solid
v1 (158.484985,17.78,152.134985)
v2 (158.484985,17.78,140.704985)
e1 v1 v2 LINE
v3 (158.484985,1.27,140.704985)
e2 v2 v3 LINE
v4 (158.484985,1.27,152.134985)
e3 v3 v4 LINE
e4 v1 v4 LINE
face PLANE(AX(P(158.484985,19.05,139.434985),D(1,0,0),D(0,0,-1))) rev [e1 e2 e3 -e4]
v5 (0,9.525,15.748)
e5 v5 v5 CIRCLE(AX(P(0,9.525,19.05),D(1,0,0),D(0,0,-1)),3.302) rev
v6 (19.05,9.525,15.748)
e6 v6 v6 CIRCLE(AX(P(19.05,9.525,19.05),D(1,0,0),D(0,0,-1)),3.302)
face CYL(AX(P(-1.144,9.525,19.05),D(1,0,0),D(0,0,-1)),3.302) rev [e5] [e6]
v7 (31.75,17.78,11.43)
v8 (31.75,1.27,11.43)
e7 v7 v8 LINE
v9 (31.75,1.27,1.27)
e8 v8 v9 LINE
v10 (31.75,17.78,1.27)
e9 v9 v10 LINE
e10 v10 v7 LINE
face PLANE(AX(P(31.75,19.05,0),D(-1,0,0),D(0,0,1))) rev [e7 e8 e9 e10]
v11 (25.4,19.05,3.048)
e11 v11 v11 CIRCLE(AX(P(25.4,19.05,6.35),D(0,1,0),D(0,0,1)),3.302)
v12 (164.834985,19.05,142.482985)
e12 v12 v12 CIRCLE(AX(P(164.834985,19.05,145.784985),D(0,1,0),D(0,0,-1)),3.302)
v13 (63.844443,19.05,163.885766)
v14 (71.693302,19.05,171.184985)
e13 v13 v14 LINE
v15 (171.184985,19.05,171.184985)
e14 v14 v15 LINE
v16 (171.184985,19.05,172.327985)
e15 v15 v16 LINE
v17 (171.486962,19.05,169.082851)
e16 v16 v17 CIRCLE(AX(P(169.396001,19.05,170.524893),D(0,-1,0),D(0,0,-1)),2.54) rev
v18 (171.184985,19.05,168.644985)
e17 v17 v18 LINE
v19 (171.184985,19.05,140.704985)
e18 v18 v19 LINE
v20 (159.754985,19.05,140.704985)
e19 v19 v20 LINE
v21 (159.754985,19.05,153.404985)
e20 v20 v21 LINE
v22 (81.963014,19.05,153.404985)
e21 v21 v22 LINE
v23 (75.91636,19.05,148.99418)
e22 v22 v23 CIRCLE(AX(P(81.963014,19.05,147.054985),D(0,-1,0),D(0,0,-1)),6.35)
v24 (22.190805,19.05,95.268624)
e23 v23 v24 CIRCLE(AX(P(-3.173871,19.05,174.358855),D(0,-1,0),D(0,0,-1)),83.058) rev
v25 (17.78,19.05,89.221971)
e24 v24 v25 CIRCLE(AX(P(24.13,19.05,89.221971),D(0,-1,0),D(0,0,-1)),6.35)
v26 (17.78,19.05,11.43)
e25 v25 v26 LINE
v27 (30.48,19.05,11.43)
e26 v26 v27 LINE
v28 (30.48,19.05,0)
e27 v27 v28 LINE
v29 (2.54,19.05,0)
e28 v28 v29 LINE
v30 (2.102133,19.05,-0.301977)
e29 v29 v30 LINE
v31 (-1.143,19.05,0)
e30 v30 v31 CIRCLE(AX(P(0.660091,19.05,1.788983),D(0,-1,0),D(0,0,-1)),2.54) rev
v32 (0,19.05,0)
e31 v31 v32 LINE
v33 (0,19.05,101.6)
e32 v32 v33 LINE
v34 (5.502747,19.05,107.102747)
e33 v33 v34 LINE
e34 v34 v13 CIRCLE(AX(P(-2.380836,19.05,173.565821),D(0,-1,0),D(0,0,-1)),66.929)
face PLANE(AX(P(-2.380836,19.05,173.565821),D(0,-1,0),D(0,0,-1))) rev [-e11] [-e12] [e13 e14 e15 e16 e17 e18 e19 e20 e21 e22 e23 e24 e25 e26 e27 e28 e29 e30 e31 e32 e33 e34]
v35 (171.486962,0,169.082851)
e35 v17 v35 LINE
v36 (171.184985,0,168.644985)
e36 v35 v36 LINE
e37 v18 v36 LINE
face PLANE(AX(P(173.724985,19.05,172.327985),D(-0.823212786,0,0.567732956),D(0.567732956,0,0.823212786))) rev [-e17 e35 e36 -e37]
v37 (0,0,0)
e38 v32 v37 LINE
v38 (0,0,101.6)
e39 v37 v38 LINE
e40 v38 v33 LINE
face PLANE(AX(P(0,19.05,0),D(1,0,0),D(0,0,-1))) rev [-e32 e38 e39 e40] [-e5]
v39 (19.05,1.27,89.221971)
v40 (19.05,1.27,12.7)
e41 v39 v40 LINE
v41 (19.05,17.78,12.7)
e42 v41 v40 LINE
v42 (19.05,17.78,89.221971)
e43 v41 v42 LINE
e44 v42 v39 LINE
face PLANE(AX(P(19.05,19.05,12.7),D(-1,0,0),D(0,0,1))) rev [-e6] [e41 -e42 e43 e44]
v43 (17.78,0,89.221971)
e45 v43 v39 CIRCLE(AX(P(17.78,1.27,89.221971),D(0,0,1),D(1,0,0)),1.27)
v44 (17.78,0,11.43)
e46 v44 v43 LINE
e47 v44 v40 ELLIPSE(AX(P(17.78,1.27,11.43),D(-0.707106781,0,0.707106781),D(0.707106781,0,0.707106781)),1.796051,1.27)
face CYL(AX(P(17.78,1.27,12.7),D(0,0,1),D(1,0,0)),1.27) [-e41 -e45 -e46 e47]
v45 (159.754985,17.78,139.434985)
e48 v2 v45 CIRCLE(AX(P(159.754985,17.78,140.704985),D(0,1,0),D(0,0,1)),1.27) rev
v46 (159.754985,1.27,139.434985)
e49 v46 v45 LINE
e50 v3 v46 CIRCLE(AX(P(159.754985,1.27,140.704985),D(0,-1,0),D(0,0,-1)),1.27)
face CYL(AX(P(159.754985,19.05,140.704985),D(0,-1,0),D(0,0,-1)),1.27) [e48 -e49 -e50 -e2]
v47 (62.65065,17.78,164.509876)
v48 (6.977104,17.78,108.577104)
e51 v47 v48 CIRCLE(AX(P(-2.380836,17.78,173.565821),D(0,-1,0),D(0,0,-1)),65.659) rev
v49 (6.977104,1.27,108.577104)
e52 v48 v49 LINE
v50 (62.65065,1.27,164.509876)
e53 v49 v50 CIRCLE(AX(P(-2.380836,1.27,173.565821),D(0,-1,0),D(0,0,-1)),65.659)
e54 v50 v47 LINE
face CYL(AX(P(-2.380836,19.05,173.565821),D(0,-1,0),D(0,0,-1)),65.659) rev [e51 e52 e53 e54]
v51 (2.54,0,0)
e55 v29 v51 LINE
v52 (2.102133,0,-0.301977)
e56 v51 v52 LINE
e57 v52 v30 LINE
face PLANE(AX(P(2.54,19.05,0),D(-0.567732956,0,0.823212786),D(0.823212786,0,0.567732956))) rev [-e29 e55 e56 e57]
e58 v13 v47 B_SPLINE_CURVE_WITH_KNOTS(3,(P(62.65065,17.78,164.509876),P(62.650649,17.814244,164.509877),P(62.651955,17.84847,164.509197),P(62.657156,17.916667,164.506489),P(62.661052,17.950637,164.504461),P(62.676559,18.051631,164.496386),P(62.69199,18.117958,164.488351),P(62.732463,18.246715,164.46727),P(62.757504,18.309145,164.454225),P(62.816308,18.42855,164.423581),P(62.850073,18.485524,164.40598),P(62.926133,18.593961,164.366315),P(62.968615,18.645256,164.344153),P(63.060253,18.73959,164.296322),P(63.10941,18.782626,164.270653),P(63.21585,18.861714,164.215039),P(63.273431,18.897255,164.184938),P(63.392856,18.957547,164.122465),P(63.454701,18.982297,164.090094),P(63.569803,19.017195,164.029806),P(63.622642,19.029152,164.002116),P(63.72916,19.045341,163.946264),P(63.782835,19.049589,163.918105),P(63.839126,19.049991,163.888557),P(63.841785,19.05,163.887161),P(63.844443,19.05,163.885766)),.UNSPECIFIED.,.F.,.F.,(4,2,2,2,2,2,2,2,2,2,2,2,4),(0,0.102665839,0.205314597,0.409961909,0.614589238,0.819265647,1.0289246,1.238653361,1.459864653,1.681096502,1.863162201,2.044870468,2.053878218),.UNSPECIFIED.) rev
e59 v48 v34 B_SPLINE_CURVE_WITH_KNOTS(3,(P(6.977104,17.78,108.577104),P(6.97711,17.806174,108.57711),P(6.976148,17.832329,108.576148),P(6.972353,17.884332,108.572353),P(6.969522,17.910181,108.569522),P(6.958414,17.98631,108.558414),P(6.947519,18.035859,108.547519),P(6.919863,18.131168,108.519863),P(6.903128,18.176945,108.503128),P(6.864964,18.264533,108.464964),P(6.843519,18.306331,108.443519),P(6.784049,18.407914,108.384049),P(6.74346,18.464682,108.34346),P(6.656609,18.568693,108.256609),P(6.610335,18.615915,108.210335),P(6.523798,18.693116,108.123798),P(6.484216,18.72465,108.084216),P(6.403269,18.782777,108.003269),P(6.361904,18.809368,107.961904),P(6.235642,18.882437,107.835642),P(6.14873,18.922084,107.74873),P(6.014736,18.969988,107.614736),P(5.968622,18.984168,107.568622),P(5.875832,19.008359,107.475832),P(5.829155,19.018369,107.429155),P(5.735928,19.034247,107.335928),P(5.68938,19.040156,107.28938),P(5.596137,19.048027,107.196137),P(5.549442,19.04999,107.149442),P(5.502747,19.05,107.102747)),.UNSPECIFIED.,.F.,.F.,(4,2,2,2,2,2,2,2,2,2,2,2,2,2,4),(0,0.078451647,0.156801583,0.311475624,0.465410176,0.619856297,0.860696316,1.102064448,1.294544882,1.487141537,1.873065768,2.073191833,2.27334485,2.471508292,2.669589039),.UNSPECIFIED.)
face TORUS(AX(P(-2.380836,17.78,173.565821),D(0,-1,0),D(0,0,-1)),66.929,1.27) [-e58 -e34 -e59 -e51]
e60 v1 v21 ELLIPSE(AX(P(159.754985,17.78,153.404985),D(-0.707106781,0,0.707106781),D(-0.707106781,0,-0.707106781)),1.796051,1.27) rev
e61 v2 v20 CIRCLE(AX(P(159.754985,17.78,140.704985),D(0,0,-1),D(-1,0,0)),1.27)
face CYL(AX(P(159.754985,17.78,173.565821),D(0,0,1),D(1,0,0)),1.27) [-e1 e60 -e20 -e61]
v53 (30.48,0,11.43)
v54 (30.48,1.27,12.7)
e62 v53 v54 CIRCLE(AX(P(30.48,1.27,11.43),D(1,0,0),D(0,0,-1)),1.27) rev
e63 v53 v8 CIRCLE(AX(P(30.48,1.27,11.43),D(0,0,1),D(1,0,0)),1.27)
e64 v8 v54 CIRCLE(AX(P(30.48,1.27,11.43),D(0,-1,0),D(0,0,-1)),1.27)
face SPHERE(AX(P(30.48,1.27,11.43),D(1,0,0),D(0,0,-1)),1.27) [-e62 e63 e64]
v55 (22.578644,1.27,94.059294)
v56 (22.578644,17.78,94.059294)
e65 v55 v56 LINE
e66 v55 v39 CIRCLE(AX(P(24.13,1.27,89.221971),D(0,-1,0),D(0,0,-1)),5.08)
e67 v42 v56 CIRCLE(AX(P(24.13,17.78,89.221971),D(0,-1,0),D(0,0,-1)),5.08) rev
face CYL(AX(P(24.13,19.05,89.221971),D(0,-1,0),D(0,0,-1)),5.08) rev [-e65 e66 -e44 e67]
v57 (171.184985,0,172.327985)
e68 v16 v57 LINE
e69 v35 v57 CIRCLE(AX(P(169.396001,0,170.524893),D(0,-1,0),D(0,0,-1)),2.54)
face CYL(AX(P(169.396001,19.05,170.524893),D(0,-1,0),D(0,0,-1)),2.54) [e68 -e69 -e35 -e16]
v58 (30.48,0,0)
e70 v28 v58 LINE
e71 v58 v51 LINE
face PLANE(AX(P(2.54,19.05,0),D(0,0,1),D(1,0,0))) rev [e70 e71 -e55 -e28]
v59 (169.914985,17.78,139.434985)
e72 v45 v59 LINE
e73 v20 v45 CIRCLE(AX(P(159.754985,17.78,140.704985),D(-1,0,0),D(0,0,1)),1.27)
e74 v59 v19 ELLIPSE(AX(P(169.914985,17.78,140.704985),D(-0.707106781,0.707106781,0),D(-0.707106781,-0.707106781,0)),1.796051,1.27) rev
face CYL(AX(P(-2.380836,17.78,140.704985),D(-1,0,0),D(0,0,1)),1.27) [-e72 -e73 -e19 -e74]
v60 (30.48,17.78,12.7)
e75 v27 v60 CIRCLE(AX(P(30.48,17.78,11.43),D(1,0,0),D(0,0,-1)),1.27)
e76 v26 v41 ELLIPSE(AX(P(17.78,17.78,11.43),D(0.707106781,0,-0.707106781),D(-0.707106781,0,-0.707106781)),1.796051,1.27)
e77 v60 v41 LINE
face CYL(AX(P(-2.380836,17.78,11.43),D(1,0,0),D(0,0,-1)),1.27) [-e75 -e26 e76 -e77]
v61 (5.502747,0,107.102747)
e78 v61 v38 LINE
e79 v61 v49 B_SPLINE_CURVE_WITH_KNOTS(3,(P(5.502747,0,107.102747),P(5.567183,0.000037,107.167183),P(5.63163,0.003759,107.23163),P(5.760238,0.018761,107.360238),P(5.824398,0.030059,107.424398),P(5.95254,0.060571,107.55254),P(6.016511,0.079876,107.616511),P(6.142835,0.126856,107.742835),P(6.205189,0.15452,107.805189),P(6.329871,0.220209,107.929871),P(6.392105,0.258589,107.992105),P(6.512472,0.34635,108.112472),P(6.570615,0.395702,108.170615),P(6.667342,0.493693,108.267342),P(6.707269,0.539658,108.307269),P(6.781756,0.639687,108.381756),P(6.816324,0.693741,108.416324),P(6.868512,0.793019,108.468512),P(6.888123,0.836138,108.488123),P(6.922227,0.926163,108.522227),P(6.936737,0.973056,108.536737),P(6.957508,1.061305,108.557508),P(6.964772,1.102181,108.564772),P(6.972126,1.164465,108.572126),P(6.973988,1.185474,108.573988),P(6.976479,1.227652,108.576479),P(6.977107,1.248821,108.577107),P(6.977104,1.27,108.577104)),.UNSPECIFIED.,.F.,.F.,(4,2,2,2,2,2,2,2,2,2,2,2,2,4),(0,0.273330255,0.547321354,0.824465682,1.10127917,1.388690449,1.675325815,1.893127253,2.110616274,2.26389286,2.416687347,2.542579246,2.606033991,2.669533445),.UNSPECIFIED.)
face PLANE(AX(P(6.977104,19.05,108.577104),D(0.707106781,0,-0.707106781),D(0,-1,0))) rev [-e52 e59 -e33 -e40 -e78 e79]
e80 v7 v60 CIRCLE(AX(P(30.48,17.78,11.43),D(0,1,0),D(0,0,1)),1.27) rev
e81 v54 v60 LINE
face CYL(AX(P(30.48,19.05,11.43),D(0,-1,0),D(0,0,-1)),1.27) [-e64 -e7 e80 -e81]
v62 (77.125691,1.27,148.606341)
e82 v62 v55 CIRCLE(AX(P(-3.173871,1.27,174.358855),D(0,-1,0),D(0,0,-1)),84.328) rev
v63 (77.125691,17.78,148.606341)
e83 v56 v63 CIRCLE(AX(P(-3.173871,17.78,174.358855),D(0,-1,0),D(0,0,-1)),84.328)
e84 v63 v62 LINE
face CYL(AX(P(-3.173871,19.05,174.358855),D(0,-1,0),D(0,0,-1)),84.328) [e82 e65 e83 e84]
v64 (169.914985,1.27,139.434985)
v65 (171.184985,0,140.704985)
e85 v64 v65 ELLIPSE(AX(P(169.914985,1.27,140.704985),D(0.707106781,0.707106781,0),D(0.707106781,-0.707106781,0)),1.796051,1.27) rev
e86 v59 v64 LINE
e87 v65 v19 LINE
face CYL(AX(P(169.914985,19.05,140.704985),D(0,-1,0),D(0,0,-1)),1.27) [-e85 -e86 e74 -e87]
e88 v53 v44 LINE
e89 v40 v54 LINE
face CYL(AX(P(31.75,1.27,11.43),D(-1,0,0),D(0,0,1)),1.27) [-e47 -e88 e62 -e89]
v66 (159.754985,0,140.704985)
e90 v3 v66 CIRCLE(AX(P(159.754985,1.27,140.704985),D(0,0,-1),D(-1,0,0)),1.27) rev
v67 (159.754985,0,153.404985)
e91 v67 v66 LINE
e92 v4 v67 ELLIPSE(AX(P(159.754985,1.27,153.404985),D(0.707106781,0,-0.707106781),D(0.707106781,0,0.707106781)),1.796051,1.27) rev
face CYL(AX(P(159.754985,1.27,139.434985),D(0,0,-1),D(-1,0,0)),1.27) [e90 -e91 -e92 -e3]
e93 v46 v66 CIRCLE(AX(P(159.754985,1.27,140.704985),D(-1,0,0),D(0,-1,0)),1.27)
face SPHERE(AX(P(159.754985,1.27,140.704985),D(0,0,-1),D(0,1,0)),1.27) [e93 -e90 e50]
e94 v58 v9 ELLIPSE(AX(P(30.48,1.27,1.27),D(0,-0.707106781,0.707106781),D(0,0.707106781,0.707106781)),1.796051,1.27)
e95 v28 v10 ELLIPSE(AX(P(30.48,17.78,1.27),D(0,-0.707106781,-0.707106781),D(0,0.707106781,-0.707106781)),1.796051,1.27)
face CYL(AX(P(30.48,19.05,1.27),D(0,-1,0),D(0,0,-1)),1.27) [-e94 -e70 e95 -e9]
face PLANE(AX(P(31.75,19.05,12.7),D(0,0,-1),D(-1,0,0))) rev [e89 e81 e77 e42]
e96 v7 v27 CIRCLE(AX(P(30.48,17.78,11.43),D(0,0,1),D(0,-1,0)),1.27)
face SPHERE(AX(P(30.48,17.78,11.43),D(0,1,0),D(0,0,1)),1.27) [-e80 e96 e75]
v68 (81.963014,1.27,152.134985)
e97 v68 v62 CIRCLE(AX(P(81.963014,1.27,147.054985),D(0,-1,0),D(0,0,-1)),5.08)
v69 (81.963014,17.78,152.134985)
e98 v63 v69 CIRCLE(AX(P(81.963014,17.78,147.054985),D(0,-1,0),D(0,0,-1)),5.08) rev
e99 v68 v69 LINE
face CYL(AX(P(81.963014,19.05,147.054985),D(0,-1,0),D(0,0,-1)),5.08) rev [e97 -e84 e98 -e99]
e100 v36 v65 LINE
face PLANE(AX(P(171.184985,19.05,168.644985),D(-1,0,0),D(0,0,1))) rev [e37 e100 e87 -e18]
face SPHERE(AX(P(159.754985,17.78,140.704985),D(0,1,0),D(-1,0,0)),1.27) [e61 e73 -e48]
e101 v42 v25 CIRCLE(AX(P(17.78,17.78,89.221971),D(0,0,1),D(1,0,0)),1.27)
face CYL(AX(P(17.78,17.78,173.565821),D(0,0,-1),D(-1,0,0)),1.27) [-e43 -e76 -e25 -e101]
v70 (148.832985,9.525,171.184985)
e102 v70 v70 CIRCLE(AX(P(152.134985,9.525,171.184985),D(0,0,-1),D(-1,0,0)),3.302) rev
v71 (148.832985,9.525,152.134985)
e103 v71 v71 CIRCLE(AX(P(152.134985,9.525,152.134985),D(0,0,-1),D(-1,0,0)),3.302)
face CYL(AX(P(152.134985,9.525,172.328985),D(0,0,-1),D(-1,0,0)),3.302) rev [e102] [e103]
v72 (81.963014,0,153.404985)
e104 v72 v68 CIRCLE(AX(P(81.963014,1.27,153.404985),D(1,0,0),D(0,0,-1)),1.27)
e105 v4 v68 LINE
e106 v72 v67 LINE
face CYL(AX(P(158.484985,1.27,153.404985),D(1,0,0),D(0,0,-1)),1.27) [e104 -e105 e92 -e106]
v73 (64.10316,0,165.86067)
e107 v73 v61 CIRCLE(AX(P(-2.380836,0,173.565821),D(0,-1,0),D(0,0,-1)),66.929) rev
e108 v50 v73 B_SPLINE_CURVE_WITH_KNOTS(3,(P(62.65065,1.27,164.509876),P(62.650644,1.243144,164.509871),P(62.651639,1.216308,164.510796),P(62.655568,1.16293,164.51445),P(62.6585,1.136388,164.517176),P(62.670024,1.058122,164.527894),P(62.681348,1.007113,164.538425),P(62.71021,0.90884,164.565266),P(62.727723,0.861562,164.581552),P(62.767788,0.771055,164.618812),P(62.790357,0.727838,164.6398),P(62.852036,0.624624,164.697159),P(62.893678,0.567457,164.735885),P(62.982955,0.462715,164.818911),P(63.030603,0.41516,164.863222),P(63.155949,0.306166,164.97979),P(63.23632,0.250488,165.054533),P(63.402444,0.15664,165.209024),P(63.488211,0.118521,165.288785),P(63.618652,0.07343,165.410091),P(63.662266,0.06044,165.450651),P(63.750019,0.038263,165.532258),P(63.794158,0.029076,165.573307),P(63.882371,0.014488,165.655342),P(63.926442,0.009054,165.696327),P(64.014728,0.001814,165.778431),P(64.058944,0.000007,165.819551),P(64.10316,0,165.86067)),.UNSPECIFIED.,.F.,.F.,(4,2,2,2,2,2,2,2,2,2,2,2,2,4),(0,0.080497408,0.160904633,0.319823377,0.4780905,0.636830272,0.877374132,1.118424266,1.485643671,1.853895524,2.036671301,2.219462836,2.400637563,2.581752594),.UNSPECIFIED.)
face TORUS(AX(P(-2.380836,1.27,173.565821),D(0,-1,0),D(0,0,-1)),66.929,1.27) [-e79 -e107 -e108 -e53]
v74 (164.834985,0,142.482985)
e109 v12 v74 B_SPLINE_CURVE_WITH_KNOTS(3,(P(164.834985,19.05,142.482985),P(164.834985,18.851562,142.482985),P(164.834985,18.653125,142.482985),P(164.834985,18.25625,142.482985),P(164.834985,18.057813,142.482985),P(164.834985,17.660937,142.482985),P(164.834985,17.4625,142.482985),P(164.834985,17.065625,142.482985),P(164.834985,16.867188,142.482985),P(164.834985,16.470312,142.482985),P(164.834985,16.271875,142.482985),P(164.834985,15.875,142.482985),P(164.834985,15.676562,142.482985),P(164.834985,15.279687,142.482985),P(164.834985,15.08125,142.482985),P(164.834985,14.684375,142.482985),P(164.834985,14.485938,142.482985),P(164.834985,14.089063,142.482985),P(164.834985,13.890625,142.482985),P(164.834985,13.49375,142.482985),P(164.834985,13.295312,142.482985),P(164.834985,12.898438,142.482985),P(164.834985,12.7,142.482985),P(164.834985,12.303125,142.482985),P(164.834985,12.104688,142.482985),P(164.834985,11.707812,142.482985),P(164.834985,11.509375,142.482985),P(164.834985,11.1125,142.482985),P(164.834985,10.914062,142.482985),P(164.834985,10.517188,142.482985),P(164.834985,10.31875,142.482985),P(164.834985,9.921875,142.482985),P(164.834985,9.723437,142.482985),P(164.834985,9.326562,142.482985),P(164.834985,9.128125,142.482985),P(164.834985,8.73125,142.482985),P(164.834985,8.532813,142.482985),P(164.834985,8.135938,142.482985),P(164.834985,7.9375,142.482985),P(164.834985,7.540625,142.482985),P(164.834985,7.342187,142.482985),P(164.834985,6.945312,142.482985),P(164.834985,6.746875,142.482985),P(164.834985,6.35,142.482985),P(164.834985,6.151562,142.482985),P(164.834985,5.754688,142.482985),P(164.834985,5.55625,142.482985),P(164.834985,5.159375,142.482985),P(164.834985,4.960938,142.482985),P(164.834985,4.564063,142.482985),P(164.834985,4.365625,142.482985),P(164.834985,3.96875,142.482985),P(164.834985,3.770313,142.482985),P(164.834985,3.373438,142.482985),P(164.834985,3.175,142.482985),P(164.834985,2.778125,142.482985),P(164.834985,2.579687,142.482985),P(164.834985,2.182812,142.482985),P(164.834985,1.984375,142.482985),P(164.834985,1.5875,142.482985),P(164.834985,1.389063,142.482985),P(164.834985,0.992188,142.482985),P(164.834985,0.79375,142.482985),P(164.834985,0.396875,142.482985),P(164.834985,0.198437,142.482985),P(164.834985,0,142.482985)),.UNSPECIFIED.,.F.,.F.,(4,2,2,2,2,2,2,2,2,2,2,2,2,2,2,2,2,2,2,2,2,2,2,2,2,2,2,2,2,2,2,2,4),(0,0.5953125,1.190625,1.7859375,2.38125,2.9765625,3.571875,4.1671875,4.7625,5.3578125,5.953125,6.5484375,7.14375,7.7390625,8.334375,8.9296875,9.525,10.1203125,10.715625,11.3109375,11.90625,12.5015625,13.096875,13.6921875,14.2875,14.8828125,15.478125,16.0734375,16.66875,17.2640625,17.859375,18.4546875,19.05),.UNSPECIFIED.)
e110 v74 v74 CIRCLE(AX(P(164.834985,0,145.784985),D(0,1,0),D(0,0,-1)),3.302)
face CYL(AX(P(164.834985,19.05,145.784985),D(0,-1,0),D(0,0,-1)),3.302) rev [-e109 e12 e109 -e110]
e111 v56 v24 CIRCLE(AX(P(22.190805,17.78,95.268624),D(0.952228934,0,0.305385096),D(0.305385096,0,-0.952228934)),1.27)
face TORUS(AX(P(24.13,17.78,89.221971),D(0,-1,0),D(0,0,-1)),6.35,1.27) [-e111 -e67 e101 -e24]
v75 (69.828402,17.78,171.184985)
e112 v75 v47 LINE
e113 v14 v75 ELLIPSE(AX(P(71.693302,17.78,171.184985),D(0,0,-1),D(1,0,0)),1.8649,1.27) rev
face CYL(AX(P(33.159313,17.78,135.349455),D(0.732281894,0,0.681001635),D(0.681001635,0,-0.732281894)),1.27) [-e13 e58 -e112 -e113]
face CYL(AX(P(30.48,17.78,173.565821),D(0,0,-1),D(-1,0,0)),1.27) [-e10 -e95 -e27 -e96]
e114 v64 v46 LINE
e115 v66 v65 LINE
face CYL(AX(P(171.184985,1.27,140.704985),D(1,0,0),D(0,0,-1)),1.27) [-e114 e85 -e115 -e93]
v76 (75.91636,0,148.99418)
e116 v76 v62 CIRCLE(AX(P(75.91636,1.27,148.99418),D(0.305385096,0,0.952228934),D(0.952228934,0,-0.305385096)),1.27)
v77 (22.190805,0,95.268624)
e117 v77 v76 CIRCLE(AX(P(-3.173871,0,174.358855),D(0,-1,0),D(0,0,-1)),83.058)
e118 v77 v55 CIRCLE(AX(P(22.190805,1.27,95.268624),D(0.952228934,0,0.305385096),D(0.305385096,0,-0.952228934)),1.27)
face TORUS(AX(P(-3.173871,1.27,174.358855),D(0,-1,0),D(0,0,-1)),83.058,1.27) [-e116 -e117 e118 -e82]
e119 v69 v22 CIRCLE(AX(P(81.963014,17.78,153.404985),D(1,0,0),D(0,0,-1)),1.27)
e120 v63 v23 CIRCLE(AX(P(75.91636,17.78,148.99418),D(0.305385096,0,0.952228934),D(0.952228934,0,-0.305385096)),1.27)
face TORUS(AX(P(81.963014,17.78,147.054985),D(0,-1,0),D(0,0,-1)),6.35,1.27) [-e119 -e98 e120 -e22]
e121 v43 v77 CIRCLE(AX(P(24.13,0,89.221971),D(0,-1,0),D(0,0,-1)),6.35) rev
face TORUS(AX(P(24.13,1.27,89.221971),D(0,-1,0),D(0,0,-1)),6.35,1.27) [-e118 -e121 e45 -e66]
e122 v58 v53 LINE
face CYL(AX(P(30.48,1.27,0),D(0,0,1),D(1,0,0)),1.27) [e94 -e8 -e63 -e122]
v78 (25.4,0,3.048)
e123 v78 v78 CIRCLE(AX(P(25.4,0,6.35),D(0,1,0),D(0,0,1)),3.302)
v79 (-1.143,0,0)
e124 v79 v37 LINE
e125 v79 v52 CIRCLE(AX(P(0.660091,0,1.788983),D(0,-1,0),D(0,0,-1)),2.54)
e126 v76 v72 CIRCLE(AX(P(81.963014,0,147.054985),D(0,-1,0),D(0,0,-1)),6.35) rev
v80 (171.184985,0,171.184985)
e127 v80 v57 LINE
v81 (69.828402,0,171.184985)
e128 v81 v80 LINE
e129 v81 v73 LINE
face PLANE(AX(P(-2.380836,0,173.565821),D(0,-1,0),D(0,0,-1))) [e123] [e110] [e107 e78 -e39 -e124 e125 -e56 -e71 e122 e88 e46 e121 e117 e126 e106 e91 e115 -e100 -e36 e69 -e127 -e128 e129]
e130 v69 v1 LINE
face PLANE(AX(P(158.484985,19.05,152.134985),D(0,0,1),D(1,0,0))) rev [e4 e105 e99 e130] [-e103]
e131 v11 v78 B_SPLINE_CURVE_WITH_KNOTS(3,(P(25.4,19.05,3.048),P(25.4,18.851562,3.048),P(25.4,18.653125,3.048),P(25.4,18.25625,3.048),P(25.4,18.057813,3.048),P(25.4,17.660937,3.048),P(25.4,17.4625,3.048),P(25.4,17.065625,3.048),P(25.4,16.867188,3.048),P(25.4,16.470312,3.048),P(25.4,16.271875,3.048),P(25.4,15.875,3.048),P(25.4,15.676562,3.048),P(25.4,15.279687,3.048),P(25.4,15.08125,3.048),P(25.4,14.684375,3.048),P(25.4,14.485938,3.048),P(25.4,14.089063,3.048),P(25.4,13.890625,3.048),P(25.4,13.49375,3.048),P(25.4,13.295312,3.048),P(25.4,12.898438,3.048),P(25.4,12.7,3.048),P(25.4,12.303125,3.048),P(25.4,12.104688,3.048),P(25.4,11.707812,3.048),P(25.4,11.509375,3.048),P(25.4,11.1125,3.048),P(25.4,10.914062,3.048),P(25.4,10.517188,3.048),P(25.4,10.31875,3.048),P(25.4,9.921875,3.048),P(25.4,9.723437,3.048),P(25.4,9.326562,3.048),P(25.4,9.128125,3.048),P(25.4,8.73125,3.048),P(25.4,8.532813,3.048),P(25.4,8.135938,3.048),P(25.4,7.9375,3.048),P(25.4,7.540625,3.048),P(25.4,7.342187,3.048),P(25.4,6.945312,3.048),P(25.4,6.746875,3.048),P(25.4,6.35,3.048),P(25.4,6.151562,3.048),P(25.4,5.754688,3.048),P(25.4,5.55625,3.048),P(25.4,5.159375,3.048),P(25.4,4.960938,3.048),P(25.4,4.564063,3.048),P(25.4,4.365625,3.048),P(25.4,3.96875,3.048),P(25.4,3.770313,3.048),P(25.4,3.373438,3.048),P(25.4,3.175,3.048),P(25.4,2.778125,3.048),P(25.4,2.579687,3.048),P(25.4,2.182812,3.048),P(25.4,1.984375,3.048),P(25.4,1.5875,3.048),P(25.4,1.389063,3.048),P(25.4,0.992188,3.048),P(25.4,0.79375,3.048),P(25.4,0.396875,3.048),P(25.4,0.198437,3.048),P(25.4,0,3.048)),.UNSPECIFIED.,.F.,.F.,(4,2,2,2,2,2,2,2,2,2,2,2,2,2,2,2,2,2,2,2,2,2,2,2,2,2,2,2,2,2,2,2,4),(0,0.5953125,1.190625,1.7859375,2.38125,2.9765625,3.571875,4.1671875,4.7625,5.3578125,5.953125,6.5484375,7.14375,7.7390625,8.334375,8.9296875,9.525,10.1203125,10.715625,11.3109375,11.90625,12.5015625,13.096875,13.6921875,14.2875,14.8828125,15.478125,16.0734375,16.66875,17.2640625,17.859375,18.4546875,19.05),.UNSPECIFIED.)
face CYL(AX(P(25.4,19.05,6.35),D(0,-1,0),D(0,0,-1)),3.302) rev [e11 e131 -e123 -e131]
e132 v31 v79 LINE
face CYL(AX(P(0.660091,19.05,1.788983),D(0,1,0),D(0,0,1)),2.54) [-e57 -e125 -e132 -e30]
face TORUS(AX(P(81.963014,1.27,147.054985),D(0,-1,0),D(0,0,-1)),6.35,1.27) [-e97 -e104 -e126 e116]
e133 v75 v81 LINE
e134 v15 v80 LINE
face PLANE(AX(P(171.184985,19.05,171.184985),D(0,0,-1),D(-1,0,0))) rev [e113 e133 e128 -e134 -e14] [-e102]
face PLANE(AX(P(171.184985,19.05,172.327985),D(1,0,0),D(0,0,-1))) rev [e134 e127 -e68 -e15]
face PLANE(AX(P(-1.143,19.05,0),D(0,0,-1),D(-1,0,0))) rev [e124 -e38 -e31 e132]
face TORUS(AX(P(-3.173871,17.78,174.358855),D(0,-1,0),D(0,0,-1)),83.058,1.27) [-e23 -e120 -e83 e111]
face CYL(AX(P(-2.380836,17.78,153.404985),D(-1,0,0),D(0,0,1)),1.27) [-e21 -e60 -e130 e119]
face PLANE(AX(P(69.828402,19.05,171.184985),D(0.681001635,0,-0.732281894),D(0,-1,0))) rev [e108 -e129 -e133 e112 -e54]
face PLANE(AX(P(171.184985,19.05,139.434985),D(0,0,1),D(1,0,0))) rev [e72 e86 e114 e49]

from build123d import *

# Parameters (mm, degrees)
SKETCH1_R           = 3.302
BOSS_EXTRUDE1_DEPTH = 19.05
CHAMFER1_SIZE       = 6.593417442
CHAMFER1_SIZE_2     = 6.35
FILLET1_R           = 5.08
FILLET2_R           = 1.27
CUT_EXTRUDE3_REACH  = 234.345
SKETCH4_R           = 3.302
CUT_EXTRUDE4_REACH  = 235.383
SKETCH5_R           = 3.302
FILLET27_R          = 2.54


with BuildPart() as part:
    # Sketch1 → Boss-Extrude1 (new body)
    with BuildSketch(Plane(origin=(0, 0, 0), x_dir=(1, 0, 0), z_dir=(0, 1, 0))):
        with BuildLine():
            Line((0, 0), (0, -107.95))
            ThreePointArc((0, -107.95), (44.047088178, -127.137896363), (63.234984541, -171.184984541))
            Line((63.234984541, -171.184984541), (171.184984541, -171.184984541))
            Line((171.184984541, -171.184984541), (171.184984541, -172.327984541))
            Line((171.184984541, -172.327984541), (173.724984541, -172.327984541))
            Line((173.724984541, -172.327984541), (171.184984541, -168.644984541))
            Line((171.184984541, -168.644984541), (171.184984541, -139.434984541))
            Line((171.184984541, -139.434984541), (158.484984541, -139.434984541))
            Line((158.484984541, -139.434984541), (158.484984541, -152.134984541))
            Line((158.484984541, -152.134984541), (78.172986392, -152.134984541))
            ThreePointArc((78.172986392, -152.134984541), (56.455029962, -114.729954579), (19.05, -93.011998149))
            Line((19.05, -93.011998149), (19.05, -12.7))
            Line((19.05, -12.7), (31.75, -12.7))
            Line((31.75, -12.7), (31.75, 0))
            Line((31.75, 0), (2.54, 0))
            Line((2.54, 0), (-1.143, 2.54))
            Line((-1.143, 2.54), (-1.143, 0))
            Line((-1.143, 0), (0, 0))
        make_face()
        with Locations(Location((25.4, -6.35, 0), (0, 0, 90))):
            Circle(SKETCH1_R, mode=Mode.SUBTRACT)
        with Locations(Location((164.834984541, -145.784984541, 0), (0, 0, 90))):
            Circle(SKETCH1_R, mode=Mode.SUBTRACT)
    extrude(amount=BOSS_EXTRUDE1_DEPTH)

    # Chamfer1
    # the kernel refuses this chamfer: 6.593417442, 6.35 mm, written as the material it takes off along each edge
    with BuildSketch(Plane(origin=(63.234984541, -17.246656522, 171.184984541), x_dir=(-0.08720585159632499, 0, -0.9961903128656491), z_dir=(0, 1, 0))) as chamfer1_piece_1:
        with BuildLine():
            Line((6.700635555, 0), (-CHAMFER1_SIZE * 0.0872058515927, -CHAMFER1_SIZE * 0.996190312824))
            Line((-CHAMFER1_SIZE * 0.0872058515927, -CHAMFER1_SIZE * 0.996190312824), (0, 0))
            ThreePointArc((0, 0), (3.448459053, -0.085459063), (6.700635555, 0))
        make_face()
    extrude(amount=53.543313044, mode=Mode.SUBTRACT)
    with BuildSketch(Plane(origin=(0, -18.02411909, 107.95), x_dir=(0, 0, -1), z_dir=(0, 1, 0))) as chamfer1_piece_2:
        with BuildLine():
            Line((CHAMFER1_SIZE_2, 0), (-0.627104296, -6.977104296))
            ThreePointArc((-0.627104296, -6.977104296), (-0.229600221, -3.597999822), (0, 0))
            Line((0, 0), (CHAMFER1_SIZE_2, 0))
        make_face()
    extrude(amount=55.098238181, mode=Mode.SUBTRACT)

    # Fillet1
    fillet1_edges = [part.edges().sort_by_distance(p)[0] for p in [
        (19.05, 9.525, 93.011998149),
        (78.172986392, 9.525, 152.134984541),
    ]]
    fillet(fillet1_edges, radius=FILLET1_R)

    # Fillet2
    fillet2_edges = [part.edges().sort_by_distance(p)[0] for p in [
        (31.75, 0, 6.35),
        (25.4, 0, 12.7),
        (120.223999201, 0, 152.134984541),
        (158.484984541, 0, 145.784984541),
        (164.834984541, 0, 139.434984541),
        (31.75, 9.525, 0),
        (31.75, 9.525, 12.7),
        (158.484984541, 9.525, 139.434984541),
        (171.184984541, 9.525, 139.434984541),
        (164.834984541, 19.05, 139.434984541),
        (158.484984541, 19.05, 145.784984541),
        (120.223999201, 19.05, 152.134984541),
        (44.154800127, 0, 127.245858784),
        (44.154800127, 19.05, 127.245858784),
        (25.4, 19.05, 12.7),
        (66.239525947, 19.05, 167.847430426),
        (31.75, 19.05, 6.35),
        (56.455029962, 0, 114.729954579),
        (56.455029962, 19.05, 114.729954579),
        (19.05, 0, 50.96098534),
        (19.05, 19.05, 50.96098534),
        (78.969227792, 0, 151.159085536),
        (78.969227792, 19.05, 151.159085536),
        (20.025899005, 0, 92.215756749),
        (20.025899005, 19.05, 92.215756749),
    ]]
    fillet(fillet2_edges, radius=FILLET2_R)

    # Sketch4 → Cut-Extrude3 (cut, up to next)
    with BuildSketch(Plane(origin=(19.05, 0, 0), x_dir=(0, 0, -1), z_dir=(1, 0, 0)), mode=Mode.PRIVATE) as cut_extrude3_sk1:
        with Locations((-19.05, 9.525)):
            Circle(SKETCH4_R)
    cut_extrude3_tool1 = extrude(cut_extrude3_sk1.sketch, amount=-CUT_EXTRUDE3_REACH, mode=Mode.PRIVATE) & part.part
    add(cut_extrude3_tool1.solids().sort_by_distance((19.05, 9.525, 19.05))[0], mode=Mode.SUBTRACT)

    # Sketch5 → Cut-Extrude4 (cut, up to next)
    with BuildSketch(Plane(origin=(0, 0, 152.134984541), x_dir=(-1, 0, 0), z_dir=(0, 0, -1)), mode=Mode.PRIVATE) as cut_extrude4_sk1:
        with Locations((-152.134984541, 9.525)):
            Circle(SKETCH5_R)
    cut_extrude4_tool1 = extrude(cut_extrude4_sk1.sketch, amount=-CUT_EXTRUDE4_REACH, mode=Mode.PRIVATE) & part.part
    add(cut_extrude4_tool1.solids().sort_by_distance((152.134985, 9.525, 152.134985))[0], mode=Mode.SUBTRACT)

    # Fillet27
    # the kernel refuses this fillet: 2.54 mm, written as the material it takes off along each edge
    with BuildSketch(Plane(origin=(-1.143, -9.855086022, -2.54), x_dir=(0, 0, 1), z_dir=(0, 1, 0))) as fillet27_piece_1:
        with BuildLine():
            CenterArc((4.328983323, 1.80309142), FILLET27_R, 145.407711312, 79.817320271)
            Line((2.238022847, 3.245133128), (0, 0))
            Line((0, 0), (2.54, 0))
        make_face()
    extrude(amount=38.760172045, mode=Mode.SUBTRACT)
    with BuildSketch(Plane(origin=(173.724984541, -9.855086022, 172.327984541), x_dir=(-0.5677329558036515, 0, -0.8232127859153119), z_dir=(0, 1, 0))) as fillet27_piece_2:
        with BuildLine():
            CenterArc((3.942034409, 2.54), FILLET27_R, 190.182679729, 79.817320271)
            Line((1.442041708, 2.090960476), (0, 0))
            Line((0, 0), (3.942034409, 0))
        make_face()
    extrude(amount=38.760172045, mode=Mode.SUBTRACT)


solid = part.part
